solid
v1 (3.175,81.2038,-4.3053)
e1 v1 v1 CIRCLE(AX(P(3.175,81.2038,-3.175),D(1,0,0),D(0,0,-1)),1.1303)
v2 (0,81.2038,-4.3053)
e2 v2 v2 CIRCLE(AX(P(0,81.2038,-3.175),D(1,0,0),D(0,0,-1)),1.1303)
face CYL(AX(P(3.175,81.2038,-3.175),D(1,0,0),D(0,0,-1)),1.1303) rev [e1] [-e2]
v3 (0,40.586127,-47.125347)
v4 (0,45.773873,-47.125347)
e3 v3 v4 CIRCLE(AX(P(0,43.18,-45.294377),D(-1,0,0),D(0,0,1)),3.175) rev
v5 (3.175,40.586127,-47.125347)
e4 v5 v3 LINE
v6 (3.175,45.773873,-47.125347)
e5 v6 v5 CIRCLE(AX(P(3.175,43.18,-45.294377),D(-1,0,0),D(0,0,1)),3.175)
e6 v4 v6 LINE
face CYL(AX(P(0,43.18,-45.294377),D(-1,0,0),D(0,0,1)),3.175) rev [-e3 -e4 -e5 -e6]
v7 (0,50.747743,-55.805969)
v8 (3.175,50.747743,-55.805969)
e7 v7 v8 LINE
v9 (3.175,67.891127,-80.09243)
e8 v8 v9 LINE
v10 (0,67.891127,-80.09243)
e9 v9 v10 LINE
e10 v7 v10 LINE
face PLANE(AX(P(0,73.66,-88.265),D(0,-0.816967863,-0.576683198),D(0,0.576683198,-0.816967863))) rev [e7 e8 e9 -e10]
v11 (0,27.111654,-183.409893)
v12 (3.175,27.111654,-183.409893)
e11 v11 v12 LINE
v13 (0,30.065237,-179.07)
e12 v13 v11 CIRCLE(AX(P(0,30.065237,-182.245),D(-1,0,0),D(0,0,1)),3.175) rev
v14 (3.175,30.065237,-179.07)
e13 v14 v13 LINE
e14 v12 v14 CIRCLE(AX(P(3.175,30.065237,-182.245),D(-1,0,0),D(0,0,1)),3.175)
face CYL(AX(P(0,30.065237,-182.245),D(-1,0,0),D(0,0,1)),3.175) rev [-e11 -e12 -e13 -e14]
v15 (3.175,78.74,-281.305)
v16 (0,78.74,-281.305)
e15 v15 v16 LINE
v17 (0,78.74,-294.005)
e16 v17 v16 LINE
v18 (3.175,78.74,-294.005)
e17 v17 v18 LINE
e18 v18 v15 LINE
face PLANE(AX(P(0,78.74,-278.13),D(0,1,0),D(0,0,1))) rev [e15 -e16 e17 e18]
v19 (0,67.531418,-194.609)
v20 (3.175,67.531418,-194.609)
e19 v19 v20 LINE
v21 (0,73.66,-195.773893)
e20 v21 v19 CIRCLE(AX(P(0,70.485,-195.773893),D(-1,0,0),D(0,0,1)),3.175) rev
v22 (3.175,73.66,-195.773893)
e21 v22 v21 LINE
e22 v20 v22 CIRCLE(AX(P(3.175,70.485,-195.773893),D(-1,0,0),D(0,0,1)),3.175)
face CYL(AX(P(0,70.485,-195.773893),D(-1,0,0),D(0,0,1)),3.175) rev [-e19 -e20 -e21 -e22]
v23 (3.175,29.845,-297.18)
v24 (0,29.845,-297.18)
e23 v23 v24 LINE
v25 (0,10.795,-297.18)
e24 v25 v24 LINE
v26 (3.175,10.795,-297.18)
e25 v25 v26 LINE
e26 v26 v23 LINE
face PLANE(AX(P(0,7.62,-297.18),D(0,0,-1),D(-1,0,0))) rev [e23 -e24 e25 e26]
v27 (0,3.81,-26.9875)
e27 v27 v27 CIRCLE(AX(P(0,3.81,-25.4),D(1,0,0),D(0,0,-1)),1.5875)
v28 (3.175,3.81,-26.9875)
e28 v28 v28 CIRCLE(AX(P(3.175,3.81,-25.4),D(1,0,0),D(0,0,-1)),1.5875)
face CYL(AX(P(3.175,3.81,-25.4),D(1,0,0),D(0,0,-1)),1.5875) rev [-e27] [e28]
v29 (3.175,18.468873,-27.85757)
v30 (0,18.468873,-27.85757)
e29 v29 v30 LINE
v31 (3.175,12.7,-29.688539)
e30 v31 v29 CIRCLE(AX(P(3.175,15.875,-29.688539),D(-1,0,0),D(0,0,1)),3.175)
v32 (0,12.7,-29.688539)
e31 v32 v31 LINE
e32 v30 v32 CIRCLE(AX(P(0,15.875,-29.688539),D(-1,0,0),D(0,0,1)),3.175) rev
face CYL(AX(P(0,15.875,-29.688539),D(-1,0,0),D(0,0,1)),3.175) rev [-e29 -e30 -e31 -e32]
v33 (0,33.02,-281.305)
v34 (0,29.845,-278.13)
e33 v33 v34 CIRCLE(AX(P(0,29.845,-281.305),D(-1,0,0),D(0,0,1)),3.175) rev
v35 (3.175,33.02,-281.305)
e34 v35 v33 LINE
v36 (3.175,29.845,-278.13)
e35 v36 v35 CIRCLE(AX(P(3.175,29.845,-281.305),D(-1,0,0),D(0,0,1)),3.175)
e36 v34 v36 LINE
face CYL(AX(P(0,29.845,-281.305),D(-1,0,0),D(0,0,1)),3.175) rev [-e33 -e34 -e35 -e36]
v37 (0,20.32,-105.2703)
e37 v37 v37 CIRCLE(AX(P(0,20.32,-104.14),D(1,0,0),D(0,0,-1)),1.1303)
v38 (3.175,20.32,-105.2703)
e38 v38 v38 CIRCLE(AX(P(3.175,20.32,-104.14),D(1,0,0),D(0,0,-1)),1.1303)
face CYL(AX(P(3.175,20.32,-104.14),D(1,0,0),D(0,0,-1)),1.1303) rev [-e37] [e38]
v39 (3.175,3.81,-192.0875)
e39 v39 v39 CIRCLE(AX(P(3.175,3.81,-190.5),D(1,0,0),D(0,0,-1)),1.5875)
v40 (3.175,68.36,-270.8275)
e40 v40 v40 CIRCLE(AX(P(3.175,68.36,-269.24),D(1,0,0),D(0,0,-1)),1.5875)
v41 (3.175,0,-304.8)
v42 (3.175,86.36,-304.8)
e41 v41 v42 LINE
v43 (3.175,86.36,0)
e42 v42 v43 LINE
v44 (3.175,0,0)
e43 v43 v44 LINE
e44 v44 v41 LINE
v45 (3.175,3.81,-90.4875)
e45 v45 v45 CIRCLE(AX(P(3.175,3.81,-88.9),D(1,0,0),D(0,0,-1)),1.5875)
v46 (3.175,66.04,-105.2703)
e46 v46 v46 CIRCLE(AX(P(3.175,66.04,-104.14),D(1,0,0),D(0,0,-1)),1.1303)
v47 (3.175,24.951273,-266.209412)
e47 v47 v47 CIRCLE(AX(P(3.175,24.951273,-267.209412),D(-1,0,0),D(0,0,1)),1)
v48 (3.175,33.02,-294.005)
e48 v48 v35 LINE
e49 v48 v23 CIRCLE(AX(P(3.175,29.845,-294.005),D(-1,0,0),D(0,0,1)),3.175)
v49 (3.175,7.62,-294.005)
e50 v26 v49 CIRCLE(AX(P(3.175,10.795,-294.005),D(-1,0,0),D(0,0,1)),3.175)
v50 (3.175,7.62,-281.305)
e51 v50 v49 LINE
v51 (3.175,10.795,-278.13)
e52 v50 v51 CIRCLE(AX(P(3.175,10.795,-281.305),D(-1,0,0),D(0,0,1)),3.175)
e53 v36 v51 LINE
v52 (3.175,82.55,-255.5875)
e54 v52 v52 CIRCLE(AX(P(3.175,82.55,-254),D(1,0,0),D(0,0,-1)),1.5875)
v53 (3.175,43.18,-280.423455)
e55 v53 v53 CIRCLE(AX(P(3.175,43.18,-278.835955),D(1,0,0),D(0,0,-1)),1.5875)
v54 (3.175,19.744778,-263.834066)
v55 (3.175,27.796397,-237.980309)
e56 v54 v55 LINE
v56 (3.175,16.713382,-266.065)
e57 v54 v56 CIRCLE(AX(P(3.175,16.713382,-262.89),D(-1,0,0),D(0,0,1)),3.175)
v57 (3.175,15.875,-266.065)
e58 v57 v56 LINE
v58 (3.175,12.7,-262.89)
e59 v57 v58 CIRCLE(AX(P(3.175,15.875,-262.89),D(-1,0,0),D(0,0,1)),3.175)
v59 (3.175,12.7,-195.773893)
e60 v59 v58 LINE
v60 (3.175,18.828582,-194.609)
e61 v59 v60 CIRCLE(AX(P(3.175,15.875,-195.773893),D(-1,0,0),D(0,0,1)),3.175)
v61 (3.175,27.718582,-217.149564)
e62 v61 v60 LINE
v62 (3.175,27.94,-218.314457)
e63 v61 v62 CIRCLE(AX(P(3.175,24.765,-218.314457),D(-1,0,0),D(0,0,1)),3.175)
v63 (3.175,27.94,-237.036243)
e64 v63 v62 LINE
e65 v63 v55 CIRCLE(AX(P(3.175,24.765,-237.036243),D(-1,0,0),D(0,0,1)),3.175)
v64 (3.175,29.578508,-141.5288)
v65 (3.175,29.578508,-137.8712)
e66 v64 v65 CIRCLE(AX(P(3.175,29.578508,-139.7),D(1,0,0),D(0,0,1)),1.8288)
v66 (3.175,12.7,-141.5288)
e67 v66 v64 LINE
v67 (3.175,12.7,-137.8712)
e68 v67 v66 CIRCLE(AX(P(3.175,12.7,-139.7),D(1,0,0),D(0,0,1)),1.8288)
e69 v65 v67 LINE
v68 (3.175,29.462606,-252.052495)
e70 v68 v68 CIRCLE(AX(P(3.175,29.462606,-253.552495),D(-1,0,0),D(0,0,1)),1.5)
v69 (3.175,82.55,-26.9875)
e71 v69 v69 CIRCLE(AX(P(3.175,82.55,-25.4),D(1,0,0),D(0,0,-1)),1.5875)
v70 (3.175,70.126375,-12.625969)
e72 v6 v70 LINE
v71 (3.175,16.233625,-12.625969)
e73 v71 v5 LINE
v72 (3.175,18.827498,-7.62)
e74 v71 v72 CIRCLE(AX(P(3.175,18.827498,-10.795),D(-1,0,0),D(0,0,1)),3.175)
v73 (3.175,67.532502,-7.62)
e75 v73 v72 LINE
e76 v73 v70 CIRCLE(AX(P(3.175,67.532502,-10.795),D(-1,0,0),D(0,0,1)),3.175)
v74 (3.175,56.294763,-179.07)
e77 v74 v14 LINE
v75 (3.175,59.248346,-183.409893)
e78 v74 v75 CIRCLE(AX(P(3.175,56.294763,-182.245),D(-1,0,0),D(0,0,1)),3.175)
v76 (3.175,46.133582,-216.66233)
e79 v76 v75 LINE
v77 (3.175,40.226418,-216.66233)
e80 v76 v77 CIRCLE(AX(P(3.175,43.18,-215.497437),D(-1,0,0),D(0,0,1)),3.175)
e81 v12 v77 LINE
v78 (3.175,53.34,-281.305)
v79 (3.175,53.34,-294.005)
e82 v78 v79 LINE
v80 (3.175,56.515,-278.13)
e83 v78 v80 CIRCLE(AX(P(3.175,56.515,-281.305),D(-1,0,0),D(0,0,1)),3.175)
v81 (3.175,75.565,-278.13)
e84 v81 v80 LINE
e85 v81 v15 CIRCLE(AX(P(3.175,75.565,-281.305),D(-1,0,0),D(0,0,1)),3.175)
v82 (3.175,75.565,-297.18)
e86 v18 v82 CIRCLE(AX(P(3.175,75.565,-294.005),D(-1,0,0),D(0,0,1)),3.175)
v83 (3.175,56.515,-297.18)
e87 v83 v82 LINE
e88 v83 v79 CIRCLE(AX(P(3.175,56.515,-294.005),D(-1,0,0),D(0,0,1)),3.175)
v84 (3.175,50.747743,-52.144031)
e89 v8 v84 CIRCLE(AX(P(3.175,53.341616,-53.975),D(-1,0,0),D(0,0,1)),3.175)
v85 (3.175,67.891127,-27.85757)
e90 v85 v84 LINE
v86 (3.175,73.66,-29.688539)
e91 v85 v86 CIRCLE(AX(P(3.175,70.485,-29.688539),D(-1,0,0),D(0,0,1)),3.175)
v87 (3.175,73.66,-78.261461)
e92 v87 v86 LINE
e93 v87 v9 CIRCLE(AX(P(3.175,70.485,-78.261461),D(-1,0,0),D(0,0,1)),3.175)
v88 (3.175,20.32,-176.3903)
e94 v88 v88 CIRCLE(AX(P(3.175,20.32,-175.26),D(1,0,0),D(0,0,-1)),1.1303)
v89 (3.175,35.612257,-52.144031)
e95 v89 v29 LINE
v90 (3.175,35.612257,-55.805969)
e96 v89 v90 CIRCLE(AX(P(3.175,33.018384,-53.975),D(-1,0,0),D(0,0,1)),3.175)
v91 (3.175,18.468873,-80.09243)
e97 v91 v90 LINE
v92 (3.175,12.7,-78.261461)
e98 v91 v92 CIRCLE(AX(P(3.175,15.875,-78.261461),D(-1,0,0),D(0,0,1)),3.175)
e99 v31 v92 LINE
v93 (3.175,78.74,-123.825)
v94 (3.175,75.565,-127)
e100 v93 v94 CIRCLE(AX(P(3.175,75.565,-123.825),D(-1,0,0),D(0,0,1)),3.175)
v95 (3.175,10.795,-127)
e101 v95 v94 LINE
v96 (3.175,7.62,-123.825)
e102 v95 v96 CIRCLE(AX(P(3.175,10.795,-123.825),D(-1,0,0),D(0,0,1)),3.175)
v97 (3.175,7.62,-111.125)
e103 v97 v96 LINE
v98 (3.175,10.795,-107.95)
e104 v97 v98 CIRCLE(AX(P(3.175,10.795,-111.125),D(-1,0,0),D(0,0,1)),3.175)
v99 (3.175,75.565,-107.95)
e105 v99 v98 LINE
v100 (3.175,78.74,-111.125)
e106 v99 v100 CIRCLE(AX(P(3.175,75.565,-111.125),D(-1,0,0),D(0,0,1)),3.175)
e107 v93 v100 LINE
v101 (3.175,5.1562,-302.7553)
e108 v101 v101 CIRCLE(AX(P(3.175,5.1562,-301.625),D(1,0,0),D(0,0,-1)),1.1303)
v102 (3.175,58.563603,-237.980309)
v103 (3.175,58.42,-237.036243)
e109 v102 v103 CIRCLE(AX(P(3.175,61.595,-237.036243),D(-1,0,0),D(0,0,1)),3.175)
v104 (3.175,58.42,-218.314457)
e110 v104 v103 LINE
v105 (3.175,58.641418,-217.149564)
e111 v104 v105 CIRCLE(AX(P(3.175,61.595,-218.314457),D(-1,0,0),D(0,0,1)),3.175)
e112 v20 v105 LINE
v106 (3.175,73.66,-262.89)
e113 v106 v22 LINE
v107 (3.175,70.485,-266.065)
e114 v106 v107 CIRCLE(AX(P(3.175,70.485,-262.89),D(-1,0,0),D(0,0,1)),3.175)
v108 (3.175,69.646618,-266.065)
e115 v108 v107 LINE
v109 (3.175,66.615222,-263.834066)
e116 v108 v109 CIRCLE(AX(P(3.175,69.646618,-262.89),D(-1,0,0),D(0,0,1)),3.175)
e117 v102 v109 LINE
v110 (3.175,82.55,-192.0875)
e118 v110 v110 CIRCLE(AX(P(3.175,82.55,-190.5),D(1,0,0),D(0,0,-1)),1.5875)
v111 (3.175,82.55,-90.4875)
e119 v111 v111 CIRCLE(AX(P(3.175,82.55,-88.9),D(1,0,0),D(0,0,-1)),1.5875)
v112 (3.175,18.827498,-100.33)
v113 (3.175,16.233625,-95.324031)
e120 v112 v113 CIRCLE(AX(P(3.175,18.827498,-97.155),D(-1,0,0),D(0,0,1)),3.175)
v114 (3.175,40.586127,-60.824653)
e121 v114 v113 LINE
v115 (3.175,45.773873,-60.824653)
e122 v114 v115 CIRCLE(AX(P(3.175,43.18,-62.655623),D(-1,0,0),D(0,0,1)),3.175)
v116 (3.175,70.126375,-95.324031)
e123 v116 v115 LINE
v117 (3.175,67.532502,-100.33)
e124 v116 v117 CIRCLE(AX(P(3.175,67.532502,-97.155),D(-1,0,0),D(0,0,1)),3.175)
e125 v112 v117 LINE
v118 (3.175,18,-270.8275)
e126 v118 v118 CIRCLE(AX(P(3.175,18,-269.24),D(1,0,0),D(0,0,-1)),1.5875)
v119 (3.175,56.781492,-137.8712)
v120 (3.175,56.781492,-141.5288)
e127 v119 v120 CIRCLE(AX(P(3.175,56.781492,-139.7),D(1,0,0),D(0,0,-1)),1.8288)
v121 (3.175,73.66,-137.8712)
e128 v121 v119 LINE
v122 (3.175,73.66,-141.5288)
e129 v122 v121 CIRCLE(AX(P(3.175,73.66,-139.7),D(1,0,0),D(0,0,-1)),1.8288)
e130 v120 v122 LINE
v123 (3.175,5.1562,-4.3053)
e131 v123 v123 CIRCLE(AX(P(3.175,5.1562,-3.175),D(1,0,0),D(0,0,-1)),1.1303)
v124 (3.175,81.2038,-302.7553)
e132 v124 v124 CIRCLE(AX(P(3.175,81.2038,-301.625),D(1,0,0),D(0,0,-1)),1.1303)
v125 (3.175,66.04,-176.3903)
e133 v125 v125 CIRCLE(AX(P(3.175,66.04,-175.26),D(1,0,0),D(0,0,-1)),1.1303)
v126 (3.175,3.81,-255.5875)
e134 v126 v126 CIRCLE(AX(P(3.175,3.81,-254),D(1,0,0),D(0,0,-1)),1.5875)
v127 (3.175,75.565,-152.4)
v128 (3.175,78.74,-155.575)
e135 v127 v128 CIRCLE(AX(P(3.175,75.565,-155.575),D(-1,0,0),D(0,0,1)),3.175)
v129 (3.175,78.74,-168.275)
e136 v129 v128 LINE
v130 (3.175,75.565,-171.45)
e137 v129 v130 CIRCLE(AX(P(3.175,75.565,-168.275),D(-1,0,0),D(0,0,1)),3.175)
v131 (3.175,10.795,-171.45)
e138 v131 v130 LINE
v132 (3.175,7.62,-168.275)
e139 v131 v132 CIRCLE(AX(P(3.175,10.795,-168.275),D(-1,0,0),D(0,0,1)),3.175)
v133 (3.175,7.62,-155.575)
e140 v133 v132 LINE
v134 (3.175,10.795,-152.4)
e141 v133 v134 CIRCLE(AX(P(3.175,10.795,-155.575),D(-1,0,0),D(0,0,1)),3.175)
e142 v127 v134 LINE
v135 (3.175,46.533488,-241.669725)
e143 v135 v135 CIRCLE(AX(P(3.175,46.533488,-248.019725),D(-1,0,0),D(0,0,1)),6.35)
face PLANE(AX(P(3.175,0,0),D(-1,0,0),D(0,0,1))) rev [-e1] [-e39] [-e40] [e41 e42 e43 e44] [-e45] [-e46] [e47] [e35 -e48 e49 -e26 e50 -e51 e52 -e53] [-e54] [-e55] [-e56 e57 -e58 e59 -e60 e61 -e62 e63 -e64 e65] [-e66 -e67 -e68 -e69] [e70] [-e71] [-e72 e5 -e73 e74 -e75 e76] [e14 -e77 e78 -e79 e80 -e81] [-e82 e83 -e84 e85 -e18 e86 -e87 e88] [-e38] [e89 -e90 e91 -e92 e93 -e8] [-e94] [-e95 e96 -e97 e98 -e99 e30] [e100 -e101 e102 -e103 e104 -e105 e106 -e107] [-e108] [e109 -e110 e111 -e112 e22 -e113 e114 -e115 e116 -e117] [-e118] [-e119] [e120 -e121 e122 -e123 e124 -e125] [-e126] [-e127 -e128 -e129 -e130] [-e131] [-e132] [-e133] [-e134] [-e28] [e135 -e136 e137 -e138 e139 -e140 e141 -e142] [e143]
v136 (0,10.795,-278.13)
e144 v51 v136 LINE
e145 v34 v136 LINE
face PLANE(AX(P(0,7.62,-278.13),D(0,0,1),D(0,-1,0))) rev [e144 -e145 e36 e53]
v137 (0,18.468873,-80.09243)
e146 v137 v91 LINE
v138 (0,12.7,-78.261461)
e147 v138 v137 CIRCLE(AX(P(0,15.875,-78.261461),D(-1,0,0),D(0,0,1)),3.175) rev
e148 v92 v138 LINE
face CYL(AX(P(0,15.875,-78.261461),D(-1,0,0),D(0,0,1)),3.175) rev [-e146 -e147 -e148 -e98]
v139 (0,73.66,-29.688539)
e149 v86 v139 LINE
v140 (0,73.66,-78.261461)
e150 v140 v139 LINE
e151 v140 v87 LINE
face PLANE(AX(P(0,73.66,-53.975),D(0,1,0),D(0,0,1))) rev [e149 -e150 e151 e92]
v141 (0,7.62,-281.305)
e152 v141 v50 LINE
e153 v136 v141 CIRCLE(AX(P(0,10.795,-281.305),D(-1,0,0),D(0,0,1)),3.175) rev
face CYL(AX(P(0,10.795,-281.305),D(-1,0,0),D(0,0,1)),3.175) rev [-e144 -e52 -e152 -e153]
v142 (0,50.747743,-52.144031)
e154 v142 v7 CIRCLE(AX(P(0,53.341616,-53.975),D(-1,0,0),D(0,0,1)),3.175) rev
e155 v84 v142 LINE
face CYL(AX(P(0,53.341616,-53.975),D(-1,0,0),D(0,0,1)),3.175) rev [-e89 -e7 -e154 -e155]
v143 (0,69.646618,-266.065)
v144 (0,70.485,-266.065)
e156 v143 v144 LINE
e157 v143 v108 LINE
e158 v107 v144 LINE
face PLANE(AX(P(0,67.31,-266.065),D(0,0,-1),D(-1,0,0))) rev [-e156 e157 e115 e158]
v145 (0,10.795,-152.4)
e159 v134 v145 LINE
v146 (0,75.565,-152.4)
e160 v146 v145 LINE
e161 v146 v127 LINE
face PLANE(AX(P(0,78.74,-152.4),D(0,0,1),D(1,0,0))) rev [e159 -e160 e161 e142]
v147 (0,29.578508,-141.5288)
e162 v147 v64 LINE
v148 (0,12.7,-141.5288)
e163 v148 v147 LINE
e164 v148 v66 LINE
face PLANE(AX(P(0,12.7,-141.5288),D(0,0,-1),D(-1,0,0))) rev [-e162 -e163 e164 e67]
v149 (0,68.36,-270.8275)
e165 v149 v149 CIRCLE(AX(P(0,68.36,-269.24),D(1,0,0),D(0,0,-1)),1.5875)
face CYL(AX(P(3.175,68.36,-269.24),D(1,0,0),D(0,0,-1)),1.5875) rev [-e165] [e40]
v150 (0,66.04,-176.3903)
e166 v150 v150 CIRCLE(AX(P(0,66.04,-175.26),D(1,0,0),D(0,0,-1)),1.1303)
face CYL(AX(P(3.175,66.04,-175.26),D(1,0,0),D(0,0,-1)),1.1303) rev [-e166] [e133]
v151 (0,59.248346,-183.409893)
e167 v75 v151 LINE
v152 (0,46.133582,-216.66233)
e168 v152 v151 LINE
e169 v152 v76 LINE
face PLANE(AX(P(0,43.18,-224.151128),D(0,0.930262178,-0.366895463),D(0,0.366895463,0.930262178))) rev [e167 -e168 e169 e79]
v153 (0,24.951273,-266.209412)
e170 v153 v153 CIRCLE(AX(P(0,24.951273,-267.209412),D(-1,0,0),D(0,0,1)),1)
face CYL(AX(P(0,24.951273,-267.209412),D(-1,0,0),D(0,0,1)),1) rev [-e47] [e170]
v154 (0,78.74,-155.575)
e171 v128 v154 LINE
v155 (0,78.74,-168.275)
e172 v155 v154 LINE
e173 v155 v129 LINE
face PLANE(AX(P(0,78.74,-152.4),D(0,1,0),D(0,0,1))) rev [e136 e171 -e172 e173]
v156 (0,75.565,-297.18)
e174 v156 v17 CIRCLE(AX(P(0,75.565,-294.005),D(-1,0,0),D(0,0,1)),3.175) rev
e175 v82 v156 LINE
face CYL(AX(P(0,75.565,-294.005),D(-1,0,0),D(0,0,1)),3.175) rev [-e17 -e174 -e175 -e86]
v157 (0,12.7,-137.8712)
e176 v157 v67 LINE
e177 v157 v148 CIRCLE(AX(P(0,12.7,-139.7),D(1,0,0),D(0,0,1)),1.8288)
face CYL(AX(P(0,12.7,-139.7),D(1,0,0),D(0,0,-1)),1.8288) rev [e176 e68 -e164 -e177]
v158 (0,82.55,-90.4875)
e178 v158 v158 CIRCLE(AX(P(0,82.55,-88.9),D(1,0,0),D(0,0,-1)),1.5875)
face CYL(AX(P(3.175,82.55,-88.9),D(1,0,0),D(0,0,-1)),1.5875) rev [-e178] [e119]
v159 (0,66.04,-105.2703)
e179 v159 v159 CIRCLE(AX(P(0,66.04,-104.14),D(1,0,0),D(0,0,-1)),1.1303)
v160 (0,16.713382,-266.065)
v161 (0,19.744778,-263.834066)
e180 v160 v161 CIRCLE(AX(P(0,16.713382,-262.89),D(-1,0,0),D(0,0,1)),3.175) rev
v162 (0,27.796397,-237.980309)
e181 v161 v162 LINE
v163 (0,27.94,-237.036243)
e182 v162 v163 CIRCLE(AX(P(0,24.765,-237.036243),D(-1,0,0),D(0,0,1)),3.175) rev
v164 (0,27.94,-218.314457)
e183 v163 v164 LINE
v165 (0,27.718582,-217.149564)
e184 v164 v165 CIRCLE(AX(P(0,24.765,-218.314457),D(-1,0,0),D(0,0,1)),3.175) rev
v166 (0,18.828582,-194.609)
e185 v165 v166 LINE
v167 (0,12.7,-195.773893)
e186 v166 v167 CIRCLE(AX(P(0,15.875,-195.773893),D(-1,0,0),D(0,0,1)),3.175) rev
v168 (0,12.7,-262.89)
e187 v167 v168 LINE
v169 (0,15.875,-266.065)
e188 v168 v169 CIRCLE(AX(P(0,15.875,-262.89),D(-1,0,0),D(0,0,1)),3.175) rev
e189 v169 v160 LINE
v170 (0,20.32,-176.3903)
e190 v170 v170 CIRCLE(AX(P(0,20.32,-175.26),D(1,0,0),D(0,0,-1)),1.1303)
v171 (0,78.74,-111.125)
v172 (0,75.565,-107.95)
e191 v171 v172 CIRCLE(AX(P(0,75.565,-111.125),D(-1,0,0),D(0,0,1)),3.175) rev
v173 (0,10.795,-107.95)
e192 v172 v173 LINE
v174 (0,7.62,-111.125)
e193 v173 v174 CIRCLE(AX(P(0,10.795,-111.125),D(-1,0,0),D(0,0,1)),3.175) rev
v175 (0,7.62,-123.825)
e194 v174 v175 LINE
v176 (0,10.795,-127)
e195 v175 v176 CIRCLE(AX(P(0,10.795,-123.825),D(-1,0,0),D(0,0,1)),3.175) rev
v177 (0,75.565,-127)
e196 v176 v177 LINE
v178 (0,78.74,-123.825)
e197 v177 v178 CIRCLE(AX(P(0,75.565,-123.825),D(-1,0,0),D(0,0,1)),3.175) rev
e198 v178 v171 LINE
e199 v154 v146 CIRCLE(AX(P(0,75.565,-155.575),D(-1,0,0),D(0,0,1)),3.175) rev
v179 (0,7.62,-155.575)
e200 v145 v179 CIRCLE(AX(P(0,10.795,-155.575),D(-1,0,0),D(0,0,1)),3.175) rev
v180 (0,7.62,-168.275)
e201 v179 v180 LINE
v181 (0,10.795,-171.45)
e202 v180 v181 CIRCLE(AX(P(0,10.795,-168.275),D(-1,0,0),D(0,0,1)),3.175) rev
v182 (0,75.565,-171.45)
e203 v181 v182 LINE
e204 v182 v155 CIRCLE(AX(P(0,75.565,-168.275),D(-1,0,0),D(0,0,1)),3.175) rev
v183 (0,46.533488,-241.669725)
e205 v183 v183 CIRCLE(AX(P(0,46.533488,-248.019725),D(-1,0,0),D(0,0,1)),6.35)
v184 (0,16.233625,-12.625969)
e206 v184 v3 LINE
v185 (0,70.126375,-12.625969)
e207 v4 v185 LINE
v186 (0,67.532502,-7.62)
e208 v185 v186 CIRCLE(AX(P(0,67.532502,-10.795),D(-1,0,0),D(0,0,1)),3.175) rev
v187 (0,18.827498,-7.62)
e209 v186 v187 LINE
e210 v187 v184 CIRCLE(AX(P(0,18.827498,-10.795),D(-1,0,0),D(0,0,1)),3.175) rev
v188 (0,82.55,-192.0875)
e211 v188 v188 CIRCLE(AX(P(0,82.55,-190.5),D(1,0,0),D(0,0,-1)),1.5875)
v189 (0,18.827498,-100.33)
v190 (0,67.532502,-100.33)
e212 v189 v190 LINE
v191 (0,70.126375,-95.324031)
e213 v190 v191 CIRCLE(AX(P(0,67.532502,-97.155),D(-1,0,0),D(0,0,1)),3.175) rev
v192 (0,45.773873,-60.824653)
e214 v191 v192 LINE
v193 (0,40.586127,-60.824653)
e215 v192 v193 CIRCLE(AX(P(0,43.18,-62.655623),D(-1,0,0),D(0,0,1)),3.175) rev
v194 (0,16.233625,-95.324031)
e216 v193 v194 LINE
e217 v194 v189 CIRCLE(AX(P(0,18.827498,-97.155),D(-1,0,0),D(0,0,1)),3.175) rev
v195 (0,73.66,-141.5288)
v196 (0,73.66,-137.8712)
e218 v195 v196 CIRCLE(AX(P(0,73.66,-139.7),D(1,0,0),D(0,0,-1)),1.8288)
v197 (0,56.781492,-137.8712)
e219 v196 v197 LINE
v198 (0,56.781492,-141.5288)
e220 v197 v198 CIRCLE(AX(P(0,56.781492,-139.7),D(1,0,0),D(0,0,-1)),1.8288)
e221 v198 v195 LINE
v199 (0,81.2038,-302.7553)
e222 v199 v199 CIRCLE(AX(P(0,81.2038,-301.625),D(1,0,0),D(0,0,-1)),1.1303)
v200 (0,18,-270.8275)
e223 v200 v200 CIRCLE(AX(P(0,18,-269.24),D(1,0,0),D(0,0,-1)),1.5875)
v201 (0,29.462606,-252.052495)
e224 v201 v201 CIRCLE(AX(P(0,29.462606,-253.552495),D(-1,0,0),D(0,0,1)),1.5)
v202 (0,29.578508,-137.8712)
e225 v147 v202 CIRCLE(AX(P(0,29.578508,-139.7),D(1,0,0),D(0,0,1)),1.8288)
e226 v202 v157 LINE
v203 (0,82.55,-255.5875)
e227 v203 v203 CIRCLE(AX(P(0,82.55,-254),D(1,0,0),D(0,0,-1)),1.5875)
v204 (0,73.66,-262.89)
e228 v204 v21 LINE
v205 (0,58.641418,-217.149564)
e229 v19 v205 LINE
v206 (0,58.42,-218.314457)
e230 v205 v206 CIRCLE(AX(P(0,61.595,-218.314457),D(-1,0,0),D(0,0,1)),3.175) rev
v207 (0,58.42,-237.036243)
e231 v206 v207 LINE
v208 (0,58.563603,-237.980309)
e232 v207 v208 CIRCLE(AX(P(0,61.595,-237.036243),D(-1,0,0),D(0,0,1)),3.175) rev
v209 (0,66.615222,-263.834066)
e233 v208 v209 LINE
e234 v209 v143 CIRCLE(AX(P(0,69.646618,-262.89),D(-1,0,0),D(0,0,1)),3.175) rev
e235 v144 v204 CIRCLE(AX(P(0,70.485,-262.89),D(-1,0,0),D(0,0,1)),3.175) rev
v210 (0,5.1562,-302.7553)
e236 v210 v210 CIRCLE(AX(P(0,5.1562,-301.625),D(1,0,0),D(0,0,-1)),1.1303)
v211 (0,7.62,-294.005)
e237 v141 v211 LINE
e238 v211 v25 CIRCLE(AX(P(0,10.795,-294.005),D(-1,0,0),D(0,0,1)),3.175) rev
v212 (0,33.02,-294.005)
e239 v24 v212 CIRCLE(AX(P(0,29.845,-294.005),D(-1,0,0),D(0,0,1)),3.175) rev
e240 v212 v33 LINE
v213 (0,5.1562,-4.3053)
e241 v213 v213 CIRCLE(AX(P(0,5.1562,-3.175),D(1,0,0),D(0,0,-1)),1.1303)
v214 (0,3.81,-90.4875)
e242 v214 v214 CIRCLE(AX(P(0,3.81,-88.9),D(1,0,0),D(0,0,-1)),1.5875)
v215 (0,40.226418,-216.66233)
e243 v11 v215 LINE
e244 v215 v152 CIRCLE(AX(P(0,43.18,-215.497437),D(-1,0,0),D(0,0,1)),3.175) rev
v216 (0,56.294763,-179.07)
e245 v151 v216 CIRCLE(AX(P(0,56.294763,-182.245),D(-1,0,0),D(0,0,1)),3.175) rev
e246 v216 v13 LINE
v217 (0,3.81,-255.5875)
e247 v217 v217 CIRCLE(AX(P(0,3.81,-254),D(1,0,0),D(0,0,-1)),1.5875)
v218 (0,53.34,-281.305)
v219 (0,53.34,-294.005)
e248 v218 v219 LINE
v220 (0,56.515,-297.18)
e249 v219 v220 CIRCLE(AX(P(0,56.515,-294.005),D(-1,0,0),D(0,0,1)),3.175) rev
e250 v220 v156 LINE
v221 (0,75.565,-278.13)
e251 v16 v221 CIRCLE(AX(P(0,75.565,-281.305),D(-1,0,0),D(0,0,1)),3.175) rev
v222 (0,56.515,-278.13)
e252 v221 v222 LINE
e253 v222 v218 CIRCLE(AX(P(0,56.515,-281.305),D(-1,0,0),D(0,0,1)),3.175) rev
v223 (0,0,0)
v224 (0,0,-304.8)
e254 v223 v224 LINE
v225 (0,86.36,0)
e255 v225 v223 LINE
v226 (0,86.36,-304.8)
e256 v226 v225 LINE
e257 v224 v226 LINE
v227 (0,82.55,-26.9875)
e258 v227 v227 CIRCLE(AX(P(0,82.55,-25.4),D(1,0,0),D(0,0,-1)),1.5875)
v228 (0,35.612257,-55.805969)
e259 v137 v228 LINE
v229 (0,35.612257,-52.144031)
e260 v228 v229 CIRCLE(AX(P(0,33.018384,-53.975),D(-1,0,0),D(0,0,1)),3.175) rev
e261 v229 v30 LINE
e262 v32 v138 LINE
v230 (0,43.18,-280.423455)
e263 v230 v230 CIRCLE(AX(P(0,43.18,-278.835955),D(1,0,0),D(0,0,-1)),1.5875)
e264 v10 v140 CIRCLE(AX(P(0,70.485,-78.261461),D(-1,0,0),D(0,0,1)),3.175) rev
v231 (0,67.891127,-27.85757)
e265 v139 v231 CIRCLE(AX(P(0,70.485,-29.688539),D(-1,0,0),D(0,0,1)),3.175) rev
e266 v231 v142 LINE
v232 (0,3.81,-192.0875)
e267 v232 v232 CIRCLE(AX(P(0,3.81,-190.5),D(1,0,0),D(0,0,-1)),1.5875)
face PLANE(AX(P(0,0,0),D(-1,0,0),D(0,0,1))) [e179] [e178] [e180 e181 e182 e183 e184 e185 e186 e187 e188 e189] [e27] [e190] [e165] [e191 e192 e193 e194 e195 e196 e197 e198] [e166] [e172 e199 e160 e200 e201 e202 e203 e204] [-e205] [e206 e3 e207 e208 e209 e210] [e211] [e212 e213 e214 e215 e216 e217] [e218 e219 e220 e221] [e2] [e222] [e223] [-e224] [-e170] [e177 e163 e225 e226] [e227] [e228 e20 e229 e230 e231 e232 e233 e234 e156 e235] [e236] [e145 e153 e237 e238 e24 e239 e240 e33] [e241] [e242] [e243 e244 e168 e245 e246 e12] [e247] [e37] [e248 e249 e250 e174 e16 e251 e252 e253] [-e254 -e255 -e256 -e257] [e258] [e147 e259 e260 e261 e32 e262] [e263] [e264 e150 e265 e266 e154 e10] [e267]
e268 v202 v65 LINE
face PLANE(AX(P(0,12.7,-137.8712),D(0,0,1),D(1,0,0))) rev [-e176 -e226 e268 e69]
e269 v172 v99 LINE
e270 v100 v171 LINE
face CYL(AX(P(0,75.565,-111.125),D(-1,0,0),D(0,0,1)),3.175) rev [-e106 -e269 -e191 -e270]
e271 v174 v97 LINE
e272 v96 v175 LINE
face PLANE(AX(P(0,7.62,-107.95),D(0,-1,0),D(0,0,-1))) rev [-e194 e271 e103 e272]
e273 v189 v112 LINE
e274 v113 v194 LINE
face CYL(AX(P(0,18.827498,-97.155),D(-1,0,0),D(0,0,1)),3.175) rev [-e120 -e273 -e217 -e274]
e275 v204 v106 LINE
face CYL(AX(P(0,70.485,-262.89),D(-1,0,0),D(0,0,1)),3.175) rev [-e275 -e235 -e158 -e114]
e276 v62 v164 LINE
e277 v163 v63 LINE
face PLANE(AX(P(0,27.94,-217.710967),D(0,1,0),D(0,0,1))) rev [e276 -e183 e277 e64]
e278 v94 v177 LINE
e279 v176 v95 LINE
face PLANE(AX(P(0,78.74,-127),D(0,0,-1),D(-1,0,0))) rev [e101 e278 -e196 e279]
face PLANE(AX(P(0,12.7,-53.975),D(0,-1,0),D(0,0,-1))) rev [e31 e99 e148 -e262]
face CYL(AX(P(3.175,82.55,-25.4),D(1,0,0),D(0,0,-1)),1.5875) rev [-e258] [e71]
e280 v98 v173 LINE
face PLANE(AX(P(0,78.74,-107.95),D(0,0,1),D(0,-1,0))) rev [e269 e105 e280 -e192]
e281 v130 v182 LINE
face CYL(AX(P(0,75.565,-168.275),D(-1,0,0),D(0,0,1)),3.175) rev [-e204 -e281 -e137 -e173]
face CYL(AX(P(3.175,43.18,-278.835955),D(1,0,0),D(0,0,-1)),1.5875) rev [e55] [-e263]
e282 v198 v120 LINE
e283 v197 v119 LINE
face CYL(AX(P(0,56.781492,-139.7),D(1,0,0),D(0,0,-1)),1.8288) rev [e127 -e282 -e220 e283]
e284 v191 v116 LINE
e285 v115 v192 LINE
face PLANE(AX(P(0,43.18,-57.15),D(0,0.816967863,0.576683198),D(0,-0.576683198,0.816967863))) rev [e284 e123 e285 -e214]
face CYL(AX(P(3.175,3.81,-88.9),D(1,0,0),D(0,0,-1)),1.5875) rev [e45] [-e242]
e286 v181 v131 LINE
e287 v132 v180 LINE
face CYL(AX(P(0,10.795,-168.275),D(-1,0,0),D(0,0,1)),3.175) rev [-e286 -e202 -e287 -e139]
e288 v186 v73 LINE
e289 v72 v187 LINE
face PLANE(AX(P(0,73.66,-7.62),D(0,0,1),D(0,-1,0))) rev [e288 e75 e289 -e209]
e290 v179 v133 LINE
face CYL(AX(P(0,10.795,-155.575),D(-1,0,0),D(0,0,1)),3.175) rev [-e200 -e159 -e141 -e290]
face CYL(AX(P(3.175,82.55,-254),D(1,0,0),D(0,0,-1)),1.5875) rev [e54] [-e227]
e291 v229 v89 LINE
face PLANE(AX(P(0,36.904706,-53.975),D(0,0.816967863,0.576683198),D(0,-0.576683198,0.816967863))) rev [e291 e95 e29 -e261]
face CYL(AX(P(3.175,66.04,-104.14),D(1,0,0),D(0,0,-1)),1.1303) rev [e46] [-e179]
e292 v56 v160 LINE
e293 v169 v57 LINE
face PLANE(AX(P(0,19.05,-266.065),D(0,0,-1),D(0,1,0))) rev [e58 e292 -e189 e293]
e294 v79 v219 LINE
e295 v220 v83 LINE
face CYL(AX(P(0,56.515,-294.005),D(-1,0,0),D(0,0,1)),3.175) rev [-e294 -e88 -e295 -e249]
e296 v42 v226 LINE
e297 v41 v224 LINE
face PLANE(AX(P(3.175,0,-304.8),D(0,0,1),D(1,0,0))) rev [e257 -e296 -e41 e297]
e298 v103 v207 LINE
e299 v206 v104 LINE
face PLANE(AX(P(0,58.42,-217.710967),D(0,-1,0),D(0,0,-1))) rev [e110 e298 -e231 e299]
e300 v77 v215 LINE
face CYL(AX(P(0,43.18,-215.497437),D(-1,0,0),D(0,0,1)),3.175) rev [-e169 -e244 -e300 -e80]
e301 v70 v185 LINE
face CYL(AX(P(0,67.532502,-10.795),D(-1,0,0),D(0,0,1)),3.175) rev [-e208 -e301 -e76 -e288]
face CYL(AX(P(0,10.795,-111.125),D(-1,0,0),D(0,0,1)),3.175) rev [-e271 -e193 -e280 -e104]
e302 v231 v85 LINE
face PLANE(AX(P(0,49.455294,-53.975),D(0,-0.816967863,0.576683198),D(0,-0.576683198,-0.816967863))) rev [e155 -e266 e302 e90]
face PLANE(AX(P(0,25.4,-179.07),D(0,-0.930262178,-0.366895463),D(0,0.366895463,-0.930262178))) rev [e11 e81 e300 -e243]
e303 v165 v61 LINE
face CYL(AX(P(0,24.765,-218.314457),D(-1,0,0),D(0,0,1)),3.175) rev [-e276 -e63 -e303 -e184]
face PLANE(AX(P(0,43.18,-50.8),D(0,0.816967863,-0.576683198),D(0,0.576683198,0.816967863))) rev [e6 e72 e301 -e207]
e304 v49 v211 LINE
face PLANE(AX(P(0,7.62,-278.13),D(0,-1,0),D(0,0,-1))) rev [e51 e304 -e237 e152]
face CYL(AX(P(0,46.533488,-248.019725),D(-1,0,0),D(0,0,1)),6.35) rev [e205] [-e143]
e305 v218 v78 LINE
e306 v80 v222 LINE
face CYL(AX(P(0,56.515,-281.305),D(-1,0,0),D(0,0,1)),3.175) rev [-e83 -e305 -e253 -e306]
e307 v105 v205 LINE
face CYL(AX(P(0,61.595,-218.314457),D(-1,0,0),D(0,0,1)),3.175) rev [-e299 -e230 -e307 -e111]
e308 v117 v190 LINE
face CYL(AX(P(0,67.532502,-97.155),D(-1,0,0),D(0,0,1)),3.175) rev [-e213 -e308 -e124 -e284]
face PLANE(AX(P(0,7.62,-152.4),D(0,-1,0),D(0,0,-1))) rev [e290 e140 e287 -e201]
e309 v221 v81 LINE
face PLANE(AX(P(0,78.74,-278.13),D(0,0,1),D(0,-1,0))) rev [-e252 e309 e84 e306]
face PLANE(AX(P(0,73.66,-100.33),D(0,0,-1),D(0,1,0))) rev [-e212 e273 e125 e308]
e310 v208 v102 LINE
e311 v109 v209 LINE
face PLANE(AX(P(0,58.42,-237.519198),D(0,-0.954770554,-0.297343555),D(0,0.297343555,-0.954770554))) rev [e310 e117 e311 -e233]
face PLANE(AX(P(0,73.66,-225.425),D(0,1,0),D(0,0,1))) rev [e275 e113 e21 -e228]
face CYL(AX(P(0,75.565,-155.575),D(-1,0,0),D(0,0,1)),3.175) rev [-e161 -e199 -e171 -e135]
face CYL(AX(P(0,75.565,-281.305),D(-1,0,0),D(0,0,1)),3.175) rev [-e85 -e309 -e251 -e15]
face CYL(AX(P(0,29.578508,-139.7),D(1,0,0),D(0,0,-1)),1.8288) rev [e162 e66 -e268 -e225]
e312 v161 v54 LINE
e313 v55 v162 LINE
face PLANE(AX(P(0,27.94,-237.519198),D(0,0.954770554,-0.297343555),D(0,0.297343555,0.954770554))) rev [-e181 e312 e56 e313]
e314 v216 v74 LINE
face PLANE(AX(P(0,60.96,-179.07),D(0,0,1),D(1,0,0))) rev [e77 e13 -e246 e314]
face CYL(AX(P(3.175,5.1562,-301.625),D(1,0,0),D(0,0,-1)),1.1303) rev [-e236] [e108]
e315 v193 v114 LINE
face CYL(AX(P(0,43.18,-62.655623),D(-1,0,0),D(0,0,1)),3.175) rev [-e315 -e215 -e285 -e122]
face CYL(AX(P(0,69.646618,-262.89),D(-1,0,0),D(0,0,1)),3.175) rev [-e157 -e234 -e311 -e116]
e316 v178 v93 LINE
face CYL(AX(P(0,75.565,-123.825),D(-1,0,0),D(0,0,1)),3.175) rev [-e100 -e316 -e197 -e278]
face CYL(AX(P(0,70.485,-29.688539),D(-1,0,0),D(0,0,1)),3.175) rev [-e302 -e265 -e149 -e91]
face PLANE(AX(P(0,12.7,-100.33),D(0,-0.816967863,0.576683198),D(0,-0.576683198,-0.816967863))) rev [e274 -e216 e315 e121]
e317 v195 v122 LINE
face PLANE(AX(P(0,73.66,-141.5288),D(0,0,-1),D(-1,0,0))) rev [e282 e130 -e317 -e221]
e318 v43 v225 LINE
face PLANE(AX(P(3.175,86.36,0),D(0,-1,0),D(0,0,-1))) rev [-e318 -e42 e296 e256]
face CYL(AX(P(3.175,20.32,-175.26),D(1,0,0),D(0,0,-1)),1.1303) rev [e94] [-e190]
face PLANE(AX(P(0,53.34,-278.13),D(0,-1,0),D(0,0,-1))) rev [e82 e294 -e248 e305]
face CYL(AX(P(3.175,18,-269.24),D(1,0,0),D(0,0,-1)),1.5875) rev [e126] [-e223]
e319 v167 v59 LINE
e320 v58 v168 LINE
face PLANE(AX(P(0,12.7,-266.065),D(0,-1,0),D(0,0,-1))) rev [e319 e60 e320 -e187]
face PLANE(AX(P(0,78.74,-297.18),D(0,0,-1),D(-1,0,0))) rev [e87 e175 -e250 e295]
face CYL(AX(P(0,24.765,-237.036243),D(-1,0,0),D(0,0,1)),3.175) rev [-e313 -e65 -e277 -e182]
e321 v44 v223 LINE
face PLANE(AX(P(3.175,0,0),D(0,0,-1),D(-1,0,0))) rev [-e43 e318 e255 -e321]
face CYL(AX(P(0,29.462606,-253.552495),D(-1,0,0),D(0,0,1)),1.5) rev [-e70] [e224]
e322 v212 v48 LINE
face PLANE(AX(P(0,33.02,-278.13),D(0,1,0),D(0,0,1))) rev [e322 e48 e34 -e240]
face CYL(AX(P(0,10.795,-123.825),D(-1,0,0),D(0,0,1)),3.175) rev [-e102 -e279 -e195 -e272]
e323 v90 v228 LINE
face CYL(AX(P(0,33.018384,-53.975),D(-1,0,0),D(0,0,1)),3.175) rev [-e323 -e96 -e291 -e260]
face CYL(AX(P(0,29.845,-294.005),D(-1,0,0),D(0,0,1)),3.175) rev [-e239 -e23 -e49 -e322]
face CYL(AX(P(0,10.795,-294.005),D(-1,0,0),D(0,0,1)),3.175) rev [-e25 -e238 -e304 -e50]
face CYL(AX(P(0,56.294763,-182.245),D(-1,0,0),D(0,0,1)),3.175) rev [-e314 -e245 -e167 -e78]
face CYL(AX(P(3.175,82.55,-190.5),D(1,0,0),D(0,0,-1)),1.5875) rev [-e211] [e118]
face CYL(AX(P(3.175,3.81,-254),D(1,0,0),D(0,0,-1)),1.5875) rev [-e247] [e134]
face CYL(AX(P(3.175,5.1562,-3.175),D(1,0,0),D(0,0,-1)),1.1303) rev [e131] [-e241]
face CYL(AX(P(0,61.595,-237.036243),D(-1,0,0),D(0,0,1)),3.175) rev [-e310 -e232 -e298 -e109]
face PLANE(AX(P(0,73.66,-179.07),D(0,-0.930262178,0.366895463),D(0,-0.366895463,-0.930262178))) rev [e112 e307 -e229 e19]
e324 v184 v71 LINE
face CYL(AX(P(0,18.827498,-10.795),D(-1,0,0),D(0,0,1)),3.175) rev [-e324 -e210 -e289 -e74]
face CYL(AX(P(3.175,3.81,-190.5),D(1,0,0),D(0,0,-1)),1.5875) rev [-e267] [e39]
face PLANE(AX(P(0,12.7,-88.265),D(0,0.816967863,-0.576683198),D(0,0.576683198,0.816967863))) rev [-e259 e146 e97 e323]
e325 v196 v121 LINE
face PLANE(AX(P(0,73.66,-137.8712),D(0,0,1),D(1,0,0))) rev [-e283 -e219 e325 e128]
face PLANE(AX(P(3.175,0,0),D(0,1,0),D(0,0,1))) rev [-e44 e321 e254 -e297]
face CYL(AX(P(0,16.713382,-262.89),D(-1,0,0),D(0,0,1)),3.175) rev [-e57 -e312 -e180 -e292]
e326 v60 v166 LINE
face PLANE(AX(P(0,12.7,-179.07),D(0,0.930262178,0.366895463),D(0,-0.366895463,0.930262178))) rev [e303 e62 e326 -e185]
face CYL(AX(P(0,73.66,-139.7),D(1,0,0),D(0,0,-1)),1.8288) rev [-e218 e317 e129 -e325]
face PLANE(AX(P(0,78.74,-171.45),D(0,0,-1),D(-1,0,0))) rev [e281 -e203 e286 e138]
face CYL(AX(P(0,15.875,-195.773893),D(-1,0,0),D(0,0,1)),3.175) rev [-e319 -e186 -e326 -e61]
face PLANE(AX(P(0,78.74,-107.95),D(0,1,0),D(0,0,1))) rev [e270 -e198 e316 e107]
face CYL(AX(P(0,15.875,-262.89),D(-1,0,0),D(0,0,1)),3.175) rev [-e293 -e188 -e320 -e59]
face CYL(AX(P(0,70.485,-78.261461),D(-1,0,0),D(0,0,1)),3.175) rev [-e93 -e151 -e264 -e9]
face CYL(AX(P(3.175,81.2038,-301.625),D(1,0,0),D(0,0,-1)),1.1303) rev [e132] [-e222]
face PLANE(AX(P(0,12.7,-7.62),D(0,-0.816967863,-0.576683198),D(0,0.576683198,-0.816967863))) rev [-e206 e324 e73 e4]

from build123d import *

# Parameters (mm, degrees)
SKETCH1_W                               = 304.8
SKETCH1_H                               = 86.36
BOSS_EXTRUDE1_DEPTH                     = 3.175
F_1_8_0_125_PRESS_DOWEL_HOLE1_OUTLINE_R = 1.5875
F_1_8_0_125_PRESS_DOWEL_HOLE1_DEPTH     = 3.175
CUT_EXTRUDE1_DEPTH                      = 317.814094107
SKETCH7_W                               = 19.05
SKETCH7_H                               = 25.4
SKETCH7_H_2                             = 71.12
CUT_EXTRUDE2_DEPTH                      = 317.814094107
FILLET1_R                               = 3.175
F_1_2_0_5_PRESS_DOWEL_HOLE1_D           = 12.7
F_3_0MM_PRESS_DOWEL_HOLE1_D             = 3
F_3_0MM_PRESS_DOWEL_HOLE1_DEPTH         = 3.175
F_3_0MM_PRESS_DOWEL_HOLE1_TIP           = 0.901290929
F_2_0MM_PRESS_DOWEL_HOLE1_D             = 2
F_2_0MM_PRESS_DOWEL_HOLE1_DEPTH         = 3.175
F_2_0MM_PRESS_DOWEL_HOLE1_TIP           = 0.600860619
F_4_40_TAPPED_HOLE2_D                   = 2.2606
F_1_8_0_125_DIAMETER_HOLE1_D            = 3.175


# Read off the part's stored shape, not the designer's step: 1/8 (0.125) Press Dowel Hole1
with BuildPart() as part:
    # Sketch1 → Boss-Extrude1 (new body)
    with BuildSketch(Plane(origin=(0, 0, 0), x_dir=(0, 0, -1), z_dir=(1, 0, 0))):
        with Locations((152.4, 43.18)):
            Rectangle(SKETCH1_W, SKETCH1_H)
    extrude(amount=BOSS_EXTRUDE1_DEPTH)

    # 1/8 (0.125) Press Dowel Hole1 outline → 1/8 (0.125) Press Dowel Hole1 (cut)
    with BuildSketch(Plane.YZ):
        with Locations((68.36, -269.24)):
            Circle(F_1_8_0_125_PRESS_DOWEL_HOLE1_OUTLINE_R)
        with Locations((18, -269.24)):
            Circle(F_1_8_0_125_PRESS_DOWEL_HOLE1_OUTLINE_R)
        with Locations((82.55, -25.4)):
            Circle(F_1_8_0_125_PRESS_DOWEL_HOLE1_OUTLINE_R)
        with Locations((82.55, -88.9)):
            Circle(F_1_8_0_125_PRESS_DOWEL_HOLE1_OUTLINE_R)
        with Locations((82.55, -190.5)):
            Circle(F_1_8_0_125_PRESS_DOWEL_HOLE1_OUTLINE_R)
        with Locations((82.55, -254)):
            Circle(F_1_8_0_125_PRESS_DOWEL_HOLE1_OUTLINE_R)
        with Locations((3.81, -254)):
            Circle(F_1_8_0_125_PRESS_DOWEL_HOLE1_OUTLINE_R)
        with Locations((3.81, -190.5)):
            Circle(F_1_8_0_125_PRESS_DOWEL_HOLE1_OUTLINE_R)
        with Locations((3.81, -88.9)):
            Circle(F_1_8_0_125_PRESS_DOWEL_HOLE1_OUTLINE_R)
        with Locations((3.81, -25.4)):
            Circle(F_1_8_0_125_PRESS_DOWEL_HOLE1_OUTLINE_R)
    extrude(amount=F_1_8_0_125_PRESS_DOWEL_HOLE1_DEPTH, mode=Mode.SUBTRACT)

    # Sketch6 → Cut-Extrude1 (cut, through all)
    with BuildSketch(Plane(origin=(3.175, 0, 0), x_dir=(0, 0, -1), z_dir=(1, 0, 0))):
        with BuildLine():
            Line((141.5288, 73.66), (141.5288, 56.781492032))
            ThreePointArc((141.5288, 56.781492032), (139.7, 54.952692032), (137.8712, 56.781492032))
            Line((137.8712, 56.781492032), (137.8712, 73.66))
            ThreePointArc((137.8712, 73.66), (139.7, 75.4888), (141.5288, 73.66))
        make_face()
        with BuildLine():
            Line((141.5288, 12.7), (141.5288, 29.578507968))
            ThreePointArc((141.5288, 29.578507968), (139.7, 31.407307968), (137.8712, 29.578507968))
            Line((137.8712, 29.578507968), (137.8712, 12.7))
            ThreePointArc((137.8712, 12.7), (139.7, 10.8712), (141.5288, 12.7))
        make_face()
    extrude(amount=-CUT_EXTRUDE1_DEPTH, mode=Mode.SUBTRACT)

    # Sketch7 → Cut-Extrude2 (cut, through all)
    with BuildSketch(Plane(origin=(3.175, 0, 0), x_dir=(0, 0, -1), z_dir=(1, 0, 0))):
        Polygon((7.62, 73.66), (7.62, 12.7), (50.8, 43.18), align=None)
        with Locations((287.655, 66.04)):
            Rectangle(SKETCH7_W, SKETCH7_H)
        Polygon((100.33, 12.7), (57.15, 43.18), (100.33, 73.66), align=None)
        with Locations((161.925, 43.18)):
            Rectangle(SKETCH7_W, SKETCH7_H_2)
        Polygon((179.07, 25.4), (224.15112849, 43.18), (179.07, 60.96), align=None)
        Polygon((53.975, 73.66), (88.265, 73.66), (53.975, 49.455294118), (19.685, 73.66), align=None)
        Polygon((53.975, 36.904705882), (19.685, 12.7), (53.975, 12.7), (88.265, 12.7), align=None)
        Polygon((179.07, 12.7), (217.710967277, 27.94), (237.51919806, 27.94), (266.065, 19.05), (266.065, 12.7), (225.425, 12.7), align=None)
        Polygon((217.710967277, 58.42), (237.51919806, 58.42), (266.065, 67.31), (266.065, 73.66), (225.425, 73.66), (179.07, 73.66), align=None)
        with Locations((287.655, 20.32)):
            Rectangle(SKETCH7_W, SKETCH7_H)
        with Locations((117.475, 43.18)):
            Rectangle(SKETCH7_W, SKETCH7_H_2)
    extrude(amount=-CUT_EXTRUDE2_DEPTH, mode=Mode.SUBTRACT)

    # Fillet1
    fillet1_edges = [part.edges().sort_by_distance(p)[0] for p in [
        (1.5875, 73.66, -7.62),
        (1.5875, 43.18, -50.8),
        (1.5875, 12.7, -7.62),
        (1.5875, 53.34, -278.13),
        (1.5875, 78.74, -278.13),
        (1.5875, 78.74, -297.18),
        (1.5875, 53.34, -297.18),
        (1.5875, 73.66, -100.33),
        (1.5875, 12.7, -100.33),
        (1.5875, 43.18, -57.15),
        (1.5875, 12.7, -179.07),
        (1.5875, 27.94, -217.710967277),
        (1.5875, 27.94, -237.51919806),
        (1.5875, 19.05, -266.065),
        (1.5875, 12.7, -266.065),
        (1.5875, 25.4, -179.07),
        (1.5875, 60.96, -179.07),
        (1.5875, 43.18, -224.15112849),
        (1.5875, 73.66, -19.685),
        (1.5875, 73.66, -88.265),
        (1.5875, 49.455294118, -53.975),
        (1.5875, 36.904705882, -53.975),
        (1.5875, 12.7, -88.265),
        (1.5875, 12.7, -19.685),
        (1.5875, 73.66, -266.065),
        (1.5875, 67.31, -266.065),
        (1.5875, 58.42, -237.51919806),
        (1.5875, 58.42, -217.710967277),
        (1.5875, 73.66, -179.07),
        (1.5875, 7.62, -152.4),
        (1.5875, 78.74, -152.4),
        (1.5875, 78.74, -171.45),
        (1.5875, 7.62, -171.45),
        (1.5875, 7.62, -278.13),
        (1.5875, 33.02, -278.13),
        (1.5875, 33.02, -297.18),
        (1.5875, 7.62, -297.18),
        (1.5875, 7.62, -107.95),
        (1.5875, 78.74, -107.95),
        (1.5875, 78.74, -127),
        (1.5875, 7.62, -127),
    ]]
    fillet(fillet1_edges, radius=FILLET1_R)

    # 1/2 (0.5) Press Dowel Hole1 (through all)
    with Locations(Plane.ZY):
        with Locations((-248.01972494, 46.53348834)):
            Hole(F_1_2_0_5_PRESS_DOWEL_HOLE1_D / 2)

    # Ø3.0mm Press Dowel Hole1
    with Locations(Plane.ZY):
        with Locations((-253.55249518, 29.46260554)):
            Hole(F_3_0MM_PRESS_DOWEL_HOLE1_D / 2, depth=F_3_0MM_PRESS_DOWEL_HOLE1_DEPTH)
            with Locations((0, 0, -(F_3_0MM_PRESS_DOWEL_HOLE1_DEPTH + F_3_0MM_PRESS_DOWEL_HOLE1_TIP / 2))):  # 118° drill point
                Cone(0, F_3_0MM_PRESS_DOWEL_HOLE1_D / 2, F_3_0MM_PRESS_DOWEL_HOLE1_TIP, mode=Mode.SUBTRACT)

    # Ø2.0mm Press Dowel Hole1
    with Locations(Plane.ZY):
        with Locations((-267.20941224, 24.95127344)):
            Hole(F_2_0MM_PRESS_DOWEL_HOLE1_D / 2, depth=F_2_0MM_PRESS_DOWEL_HOLE1_DEPTH)
            with Locations((0, 0, -(F_2_0MM_PRESS_DOWEL_HOLE1_DEPTH + F_2_0MM_PRESS_DOWEL_HOLE1_TIP / 2))):  # 118° drill point
                Cone(0, F_2_0MM_PRESS_DOWEL_HOLE1_D / 2, F_2_0MM_PRESS_DOWEL_HOLE1_TIP, mode=Mode.SUBTRACT)

    # #4-40 Tapped Hole2 (through all)
    with Locations(Plane(origin=(3.175, 0, 0), x_dir=(0, 0, -1), z_dir=(1, 0, 0))):
        with Locations((301.625, 81.2038), (301.625, 5.1562), (3.175, 81.2038), (3.175, 5.1562), (175.26, 66.04), (175.26, 20.32), (104.14, 66.04), (104.14, 20.32)):
            Hole(F_4_40_TAPPED_HOLE2_D / 2)

    # 1/8 (0.125) Diameter Hole1 (through all)
    with Locations(Plane(origin=(3.175, 0, 0), x_dir=(0, 0, -1), z_dir=(1, 0, 0))):
        with Locations((278.835955069, 43.18)):
            Hole(F_1_8_0_125_DIAMETER_HOLE1_D / 2)


solid = part.part
